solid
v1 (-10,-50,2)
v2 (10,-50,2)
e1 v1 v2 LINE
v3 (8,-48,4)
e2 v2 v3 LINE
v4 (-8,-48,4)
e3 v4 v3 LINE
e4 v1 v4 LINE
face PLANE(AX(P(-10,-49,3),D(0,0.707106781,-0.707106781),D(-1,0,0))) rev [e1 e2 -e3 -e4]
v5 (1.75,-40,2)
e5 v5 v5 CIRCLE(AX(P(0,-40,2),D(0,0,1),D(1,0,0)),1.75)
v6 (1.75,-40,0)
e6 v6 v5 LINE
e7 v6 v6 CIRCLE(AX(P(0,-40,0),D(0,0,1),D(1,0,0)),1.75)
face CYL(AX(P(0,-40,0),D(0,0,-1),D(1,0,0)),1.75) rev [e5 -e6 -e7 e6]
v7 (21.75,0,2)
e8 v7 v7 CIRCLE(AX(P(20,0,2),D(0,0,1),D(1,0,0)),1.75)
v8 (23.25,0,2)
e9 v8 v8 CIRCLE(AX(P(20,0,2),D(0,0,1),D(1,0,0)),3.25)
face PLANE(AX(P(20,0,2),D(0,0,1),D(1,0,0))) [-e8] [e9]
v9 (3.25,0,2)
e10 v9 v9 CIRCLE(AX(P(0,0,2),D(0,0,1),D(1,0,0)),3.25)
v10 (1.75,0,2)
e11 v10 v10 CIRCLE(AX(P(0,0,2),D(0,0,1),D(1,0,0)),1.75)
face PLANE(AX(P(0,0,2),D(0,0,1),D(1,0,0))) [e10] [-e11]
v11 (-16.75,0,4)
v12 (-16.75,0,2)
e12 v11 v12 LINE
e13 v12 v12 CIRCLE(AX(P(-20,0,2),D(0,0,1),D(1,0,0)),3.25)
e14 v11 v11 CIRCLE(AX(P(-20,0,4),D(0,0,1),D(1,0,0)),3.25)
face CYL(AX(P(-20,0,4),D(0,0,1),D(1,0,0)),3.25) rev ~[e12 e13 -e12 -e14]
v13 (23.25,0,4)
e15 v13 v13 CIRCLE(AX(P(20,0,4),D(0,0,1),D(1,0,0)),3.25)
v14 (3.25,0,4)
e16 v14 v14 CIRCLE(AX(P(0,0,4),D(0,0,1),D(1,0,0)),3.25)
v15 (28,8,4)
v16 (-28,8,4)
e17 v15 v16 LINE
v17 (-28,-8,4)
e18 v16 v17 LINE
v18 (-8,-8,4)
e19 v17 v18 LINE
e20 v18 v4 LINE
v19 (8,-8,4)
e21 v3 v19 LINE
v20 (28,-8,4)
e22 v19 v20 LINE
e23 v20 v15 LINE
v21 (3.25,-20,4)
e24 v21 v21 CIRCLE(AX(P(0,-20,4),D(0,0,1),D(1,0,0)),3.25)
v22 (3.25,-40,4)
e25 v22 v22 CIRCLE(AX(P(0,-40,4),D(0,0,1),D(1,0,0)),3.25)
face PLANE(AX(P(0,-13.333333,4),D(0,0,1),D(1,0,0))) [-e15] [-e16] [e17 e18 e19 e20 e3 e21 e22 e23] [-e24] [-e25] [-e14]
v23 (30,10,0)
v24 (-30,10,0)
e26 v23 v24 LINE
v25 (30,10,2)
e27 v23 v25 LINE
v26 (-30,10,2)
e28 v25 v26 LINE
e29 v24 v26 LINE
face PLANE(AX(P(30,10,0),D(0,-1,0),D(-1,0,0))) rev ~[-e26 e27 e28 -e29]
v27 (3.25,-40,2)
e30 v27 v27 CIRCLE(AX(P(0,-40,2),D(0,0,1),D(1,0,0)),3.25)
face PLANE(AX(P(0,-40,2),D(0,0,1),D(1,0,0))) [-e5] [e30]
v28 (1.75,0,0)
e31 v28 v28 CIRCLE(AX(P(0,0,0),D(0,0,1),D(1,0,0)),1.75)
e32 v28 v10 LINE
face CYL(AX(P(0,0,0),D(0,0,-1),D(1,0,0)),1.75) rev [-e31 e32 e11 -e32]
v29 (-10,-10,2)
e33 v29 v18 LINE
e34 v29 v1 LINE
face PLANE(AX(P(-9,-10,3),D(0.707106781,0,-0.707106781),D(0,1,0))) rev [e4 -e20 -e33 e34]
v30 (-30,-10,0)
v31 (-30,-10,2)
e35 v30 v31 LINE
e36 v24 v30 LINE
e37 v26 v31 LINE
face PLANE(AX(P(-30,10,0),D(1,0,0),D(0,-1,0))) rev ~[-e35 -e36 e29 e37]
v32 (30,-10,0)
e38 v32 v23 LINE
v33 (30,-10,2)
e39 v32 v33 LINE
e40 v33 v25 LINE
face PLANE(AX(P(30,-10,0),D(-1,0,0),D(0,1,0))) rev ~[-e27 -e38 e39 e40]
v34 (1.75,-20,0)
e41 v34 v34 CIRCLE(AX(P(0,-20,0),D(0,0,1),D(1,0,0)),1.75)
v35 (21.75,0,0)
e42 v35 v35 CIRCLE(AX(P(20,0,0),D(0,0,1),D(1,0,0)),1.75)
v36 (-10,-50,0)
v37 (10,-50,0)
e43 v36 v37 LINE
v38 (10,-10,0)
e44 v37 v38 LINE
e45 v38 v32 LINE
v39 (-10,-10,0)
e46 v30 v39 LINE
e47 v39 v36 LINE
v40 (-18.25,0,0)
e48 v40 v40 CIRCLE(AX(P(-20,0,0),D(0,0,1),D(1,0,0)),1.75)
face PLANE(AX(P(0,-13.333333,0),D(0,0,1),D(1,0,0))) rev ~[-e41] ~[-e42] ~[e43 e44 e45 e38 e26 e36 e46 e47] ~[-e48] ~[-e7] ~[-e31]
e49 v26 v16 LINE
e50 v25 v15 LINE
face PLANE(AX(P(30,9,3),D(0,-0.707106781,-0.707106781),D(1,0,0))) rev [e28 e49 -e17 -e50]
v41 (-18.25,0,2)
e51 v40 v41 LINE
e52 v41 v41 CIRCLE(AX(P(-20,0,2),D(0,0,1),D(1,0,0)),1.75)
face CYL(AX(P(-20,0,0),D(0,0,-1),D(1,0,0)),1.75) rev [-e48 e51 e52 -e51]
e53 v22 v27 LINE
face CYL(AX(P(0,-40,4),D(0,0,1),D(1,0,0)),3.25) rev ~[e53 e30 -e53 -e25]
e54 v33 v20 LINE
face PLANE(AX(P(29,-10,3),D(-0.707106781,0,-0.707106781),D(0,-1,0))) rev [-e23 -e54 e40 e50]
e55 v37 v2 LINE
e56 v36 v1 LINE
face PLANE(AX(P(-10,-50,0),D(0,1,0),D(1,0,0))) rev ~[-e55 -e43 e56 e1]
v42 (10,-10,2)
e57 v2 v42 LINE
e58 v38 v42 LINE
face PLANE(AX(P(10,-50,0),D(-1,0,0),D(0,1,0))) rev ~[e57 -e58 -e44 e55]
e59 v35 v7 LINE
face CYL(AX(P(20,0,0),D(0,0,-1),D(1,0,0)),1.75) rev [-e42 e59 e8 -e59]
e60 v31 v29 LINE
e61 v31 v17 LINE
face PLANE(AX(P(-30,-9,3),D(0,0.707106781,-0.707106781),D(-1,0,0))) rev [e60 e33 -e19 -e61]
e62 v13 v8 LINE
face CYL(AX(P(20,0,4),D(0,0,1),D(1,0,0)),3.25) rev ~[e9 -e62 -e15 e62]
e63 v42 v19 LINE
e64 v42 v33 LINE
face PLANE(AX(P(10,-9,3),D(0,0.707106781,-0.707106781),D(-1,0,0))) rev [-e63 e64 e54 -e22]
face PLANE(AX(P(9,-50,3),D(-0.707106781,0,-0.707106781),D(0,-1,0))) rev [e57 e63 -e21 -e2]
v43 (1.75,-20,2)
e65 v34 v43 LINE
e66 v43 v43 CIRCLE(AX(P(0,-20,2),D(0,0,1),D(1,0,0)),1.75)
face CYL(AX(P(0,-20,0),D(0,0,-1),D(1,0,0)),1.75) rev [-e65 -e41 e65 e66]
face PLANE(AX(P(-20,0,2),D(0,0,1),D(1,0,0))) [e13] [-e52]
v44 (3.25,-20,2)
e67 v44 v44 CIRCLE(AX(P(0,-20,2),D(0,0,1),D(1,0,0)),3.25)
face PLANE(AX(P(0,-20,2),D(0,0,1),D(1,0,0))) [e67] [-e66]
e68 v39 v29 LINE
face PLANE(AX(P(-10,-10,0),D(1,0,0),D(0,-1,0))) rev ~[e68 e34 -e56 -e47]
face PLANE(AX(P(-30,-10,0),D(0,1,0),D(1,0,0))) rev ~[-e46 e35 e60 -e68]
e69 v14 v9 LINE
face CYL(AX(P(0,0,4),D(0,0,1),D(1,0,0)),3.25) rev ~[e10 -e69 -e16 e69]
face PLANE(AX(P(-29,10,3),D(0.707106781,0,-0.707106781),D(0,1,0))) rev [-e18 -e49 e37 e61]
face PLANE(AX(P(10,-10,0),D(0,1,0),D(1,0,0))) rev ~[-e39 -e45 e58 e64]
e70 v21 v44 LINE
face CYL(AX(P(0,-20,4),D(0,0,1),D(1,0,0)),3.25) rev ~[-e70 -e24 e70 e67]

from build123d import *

# Parameters (mm, degrees)
F2_R     = 1.75
F3_DEPTH = 4
F4_SIZE  = 2
F5_R     = 3.25
F5_R_2   = 1.75
F6_DEPTH = 2


with BuildPart() as f3:
    # F2 (on Top) → F3 (new body)
    with BuildSketch(Plane.XY):
        Polygon((-10, -50), (0, -50), (10, -50), (10, -10), (30, -10), (30, 10), (0, 10), (-30, 10), (-30, -10), (-10, -10), align=None)
        with Locations((0, -40)):
            Circle(F2_R, mode=Mode.SUBTRACT)
        with Locations((-20, 0)):
            Circle(F2_R, mode=Mode.SUBTRACT)
        with Locations((0, -20)):
            Circle(F2_R, mode=Mode.SUBTRACT)
        Circle(F2_R, mode=Mode.SUBTRACT)
        with Locations((20, 0)):
            Circle(F2_R, mode=Mode.SUBTRACT)
    extrude(amount=F3_DEPTH)

    # F4
    f4_edges = [f3.edges().sort_by_distance(p)[0] for p in [
        (0, -50, 4),
        (10, -30, 4),
        (20, -10, 4),
        (30, 0, 4),
        (0, 10, 4),
        (-30, 0, 4),
        (-20, -10, 4),
        (-10, -30, 4),
    ]]
    chamfer(f4_edges, length=F4_SIZE)

    # F5 (on face) → F6 (cut)
    with BuildSketch(Plane.XY.offset(4)):
        with Locations((-20, 0)):
            Circle(F5_R)
        with Locations((-20, 0)):
            Circle(F5_R_2, mode=Mode.SUBTRACT)
        Circle(F5_R)
        Circle(F5_R_2, mode=Mode.SUBTRACT)
        with Locations((20, 0)):
            Circle(F5_R)
        with Locations((20, 0)):
            Circle(F5_R_2, mode=Mode.SUBTRACT)
        with Locations((0, -20)):
            Circle(F5_R)
        with Locations((0, -20)):
            Circle(F5_R_2, mode=Mode.SUBTRACT)
        with Locations((0, -40)):
            Circle(F5_R)
        with Locations((0, -40)):
            Circle(F5_R_2, mode=Mode.SUBTRACT)
    extrude(amount=-F6_DEPTH, mode=Mode.SUBTRACT)


solid = f3.part
